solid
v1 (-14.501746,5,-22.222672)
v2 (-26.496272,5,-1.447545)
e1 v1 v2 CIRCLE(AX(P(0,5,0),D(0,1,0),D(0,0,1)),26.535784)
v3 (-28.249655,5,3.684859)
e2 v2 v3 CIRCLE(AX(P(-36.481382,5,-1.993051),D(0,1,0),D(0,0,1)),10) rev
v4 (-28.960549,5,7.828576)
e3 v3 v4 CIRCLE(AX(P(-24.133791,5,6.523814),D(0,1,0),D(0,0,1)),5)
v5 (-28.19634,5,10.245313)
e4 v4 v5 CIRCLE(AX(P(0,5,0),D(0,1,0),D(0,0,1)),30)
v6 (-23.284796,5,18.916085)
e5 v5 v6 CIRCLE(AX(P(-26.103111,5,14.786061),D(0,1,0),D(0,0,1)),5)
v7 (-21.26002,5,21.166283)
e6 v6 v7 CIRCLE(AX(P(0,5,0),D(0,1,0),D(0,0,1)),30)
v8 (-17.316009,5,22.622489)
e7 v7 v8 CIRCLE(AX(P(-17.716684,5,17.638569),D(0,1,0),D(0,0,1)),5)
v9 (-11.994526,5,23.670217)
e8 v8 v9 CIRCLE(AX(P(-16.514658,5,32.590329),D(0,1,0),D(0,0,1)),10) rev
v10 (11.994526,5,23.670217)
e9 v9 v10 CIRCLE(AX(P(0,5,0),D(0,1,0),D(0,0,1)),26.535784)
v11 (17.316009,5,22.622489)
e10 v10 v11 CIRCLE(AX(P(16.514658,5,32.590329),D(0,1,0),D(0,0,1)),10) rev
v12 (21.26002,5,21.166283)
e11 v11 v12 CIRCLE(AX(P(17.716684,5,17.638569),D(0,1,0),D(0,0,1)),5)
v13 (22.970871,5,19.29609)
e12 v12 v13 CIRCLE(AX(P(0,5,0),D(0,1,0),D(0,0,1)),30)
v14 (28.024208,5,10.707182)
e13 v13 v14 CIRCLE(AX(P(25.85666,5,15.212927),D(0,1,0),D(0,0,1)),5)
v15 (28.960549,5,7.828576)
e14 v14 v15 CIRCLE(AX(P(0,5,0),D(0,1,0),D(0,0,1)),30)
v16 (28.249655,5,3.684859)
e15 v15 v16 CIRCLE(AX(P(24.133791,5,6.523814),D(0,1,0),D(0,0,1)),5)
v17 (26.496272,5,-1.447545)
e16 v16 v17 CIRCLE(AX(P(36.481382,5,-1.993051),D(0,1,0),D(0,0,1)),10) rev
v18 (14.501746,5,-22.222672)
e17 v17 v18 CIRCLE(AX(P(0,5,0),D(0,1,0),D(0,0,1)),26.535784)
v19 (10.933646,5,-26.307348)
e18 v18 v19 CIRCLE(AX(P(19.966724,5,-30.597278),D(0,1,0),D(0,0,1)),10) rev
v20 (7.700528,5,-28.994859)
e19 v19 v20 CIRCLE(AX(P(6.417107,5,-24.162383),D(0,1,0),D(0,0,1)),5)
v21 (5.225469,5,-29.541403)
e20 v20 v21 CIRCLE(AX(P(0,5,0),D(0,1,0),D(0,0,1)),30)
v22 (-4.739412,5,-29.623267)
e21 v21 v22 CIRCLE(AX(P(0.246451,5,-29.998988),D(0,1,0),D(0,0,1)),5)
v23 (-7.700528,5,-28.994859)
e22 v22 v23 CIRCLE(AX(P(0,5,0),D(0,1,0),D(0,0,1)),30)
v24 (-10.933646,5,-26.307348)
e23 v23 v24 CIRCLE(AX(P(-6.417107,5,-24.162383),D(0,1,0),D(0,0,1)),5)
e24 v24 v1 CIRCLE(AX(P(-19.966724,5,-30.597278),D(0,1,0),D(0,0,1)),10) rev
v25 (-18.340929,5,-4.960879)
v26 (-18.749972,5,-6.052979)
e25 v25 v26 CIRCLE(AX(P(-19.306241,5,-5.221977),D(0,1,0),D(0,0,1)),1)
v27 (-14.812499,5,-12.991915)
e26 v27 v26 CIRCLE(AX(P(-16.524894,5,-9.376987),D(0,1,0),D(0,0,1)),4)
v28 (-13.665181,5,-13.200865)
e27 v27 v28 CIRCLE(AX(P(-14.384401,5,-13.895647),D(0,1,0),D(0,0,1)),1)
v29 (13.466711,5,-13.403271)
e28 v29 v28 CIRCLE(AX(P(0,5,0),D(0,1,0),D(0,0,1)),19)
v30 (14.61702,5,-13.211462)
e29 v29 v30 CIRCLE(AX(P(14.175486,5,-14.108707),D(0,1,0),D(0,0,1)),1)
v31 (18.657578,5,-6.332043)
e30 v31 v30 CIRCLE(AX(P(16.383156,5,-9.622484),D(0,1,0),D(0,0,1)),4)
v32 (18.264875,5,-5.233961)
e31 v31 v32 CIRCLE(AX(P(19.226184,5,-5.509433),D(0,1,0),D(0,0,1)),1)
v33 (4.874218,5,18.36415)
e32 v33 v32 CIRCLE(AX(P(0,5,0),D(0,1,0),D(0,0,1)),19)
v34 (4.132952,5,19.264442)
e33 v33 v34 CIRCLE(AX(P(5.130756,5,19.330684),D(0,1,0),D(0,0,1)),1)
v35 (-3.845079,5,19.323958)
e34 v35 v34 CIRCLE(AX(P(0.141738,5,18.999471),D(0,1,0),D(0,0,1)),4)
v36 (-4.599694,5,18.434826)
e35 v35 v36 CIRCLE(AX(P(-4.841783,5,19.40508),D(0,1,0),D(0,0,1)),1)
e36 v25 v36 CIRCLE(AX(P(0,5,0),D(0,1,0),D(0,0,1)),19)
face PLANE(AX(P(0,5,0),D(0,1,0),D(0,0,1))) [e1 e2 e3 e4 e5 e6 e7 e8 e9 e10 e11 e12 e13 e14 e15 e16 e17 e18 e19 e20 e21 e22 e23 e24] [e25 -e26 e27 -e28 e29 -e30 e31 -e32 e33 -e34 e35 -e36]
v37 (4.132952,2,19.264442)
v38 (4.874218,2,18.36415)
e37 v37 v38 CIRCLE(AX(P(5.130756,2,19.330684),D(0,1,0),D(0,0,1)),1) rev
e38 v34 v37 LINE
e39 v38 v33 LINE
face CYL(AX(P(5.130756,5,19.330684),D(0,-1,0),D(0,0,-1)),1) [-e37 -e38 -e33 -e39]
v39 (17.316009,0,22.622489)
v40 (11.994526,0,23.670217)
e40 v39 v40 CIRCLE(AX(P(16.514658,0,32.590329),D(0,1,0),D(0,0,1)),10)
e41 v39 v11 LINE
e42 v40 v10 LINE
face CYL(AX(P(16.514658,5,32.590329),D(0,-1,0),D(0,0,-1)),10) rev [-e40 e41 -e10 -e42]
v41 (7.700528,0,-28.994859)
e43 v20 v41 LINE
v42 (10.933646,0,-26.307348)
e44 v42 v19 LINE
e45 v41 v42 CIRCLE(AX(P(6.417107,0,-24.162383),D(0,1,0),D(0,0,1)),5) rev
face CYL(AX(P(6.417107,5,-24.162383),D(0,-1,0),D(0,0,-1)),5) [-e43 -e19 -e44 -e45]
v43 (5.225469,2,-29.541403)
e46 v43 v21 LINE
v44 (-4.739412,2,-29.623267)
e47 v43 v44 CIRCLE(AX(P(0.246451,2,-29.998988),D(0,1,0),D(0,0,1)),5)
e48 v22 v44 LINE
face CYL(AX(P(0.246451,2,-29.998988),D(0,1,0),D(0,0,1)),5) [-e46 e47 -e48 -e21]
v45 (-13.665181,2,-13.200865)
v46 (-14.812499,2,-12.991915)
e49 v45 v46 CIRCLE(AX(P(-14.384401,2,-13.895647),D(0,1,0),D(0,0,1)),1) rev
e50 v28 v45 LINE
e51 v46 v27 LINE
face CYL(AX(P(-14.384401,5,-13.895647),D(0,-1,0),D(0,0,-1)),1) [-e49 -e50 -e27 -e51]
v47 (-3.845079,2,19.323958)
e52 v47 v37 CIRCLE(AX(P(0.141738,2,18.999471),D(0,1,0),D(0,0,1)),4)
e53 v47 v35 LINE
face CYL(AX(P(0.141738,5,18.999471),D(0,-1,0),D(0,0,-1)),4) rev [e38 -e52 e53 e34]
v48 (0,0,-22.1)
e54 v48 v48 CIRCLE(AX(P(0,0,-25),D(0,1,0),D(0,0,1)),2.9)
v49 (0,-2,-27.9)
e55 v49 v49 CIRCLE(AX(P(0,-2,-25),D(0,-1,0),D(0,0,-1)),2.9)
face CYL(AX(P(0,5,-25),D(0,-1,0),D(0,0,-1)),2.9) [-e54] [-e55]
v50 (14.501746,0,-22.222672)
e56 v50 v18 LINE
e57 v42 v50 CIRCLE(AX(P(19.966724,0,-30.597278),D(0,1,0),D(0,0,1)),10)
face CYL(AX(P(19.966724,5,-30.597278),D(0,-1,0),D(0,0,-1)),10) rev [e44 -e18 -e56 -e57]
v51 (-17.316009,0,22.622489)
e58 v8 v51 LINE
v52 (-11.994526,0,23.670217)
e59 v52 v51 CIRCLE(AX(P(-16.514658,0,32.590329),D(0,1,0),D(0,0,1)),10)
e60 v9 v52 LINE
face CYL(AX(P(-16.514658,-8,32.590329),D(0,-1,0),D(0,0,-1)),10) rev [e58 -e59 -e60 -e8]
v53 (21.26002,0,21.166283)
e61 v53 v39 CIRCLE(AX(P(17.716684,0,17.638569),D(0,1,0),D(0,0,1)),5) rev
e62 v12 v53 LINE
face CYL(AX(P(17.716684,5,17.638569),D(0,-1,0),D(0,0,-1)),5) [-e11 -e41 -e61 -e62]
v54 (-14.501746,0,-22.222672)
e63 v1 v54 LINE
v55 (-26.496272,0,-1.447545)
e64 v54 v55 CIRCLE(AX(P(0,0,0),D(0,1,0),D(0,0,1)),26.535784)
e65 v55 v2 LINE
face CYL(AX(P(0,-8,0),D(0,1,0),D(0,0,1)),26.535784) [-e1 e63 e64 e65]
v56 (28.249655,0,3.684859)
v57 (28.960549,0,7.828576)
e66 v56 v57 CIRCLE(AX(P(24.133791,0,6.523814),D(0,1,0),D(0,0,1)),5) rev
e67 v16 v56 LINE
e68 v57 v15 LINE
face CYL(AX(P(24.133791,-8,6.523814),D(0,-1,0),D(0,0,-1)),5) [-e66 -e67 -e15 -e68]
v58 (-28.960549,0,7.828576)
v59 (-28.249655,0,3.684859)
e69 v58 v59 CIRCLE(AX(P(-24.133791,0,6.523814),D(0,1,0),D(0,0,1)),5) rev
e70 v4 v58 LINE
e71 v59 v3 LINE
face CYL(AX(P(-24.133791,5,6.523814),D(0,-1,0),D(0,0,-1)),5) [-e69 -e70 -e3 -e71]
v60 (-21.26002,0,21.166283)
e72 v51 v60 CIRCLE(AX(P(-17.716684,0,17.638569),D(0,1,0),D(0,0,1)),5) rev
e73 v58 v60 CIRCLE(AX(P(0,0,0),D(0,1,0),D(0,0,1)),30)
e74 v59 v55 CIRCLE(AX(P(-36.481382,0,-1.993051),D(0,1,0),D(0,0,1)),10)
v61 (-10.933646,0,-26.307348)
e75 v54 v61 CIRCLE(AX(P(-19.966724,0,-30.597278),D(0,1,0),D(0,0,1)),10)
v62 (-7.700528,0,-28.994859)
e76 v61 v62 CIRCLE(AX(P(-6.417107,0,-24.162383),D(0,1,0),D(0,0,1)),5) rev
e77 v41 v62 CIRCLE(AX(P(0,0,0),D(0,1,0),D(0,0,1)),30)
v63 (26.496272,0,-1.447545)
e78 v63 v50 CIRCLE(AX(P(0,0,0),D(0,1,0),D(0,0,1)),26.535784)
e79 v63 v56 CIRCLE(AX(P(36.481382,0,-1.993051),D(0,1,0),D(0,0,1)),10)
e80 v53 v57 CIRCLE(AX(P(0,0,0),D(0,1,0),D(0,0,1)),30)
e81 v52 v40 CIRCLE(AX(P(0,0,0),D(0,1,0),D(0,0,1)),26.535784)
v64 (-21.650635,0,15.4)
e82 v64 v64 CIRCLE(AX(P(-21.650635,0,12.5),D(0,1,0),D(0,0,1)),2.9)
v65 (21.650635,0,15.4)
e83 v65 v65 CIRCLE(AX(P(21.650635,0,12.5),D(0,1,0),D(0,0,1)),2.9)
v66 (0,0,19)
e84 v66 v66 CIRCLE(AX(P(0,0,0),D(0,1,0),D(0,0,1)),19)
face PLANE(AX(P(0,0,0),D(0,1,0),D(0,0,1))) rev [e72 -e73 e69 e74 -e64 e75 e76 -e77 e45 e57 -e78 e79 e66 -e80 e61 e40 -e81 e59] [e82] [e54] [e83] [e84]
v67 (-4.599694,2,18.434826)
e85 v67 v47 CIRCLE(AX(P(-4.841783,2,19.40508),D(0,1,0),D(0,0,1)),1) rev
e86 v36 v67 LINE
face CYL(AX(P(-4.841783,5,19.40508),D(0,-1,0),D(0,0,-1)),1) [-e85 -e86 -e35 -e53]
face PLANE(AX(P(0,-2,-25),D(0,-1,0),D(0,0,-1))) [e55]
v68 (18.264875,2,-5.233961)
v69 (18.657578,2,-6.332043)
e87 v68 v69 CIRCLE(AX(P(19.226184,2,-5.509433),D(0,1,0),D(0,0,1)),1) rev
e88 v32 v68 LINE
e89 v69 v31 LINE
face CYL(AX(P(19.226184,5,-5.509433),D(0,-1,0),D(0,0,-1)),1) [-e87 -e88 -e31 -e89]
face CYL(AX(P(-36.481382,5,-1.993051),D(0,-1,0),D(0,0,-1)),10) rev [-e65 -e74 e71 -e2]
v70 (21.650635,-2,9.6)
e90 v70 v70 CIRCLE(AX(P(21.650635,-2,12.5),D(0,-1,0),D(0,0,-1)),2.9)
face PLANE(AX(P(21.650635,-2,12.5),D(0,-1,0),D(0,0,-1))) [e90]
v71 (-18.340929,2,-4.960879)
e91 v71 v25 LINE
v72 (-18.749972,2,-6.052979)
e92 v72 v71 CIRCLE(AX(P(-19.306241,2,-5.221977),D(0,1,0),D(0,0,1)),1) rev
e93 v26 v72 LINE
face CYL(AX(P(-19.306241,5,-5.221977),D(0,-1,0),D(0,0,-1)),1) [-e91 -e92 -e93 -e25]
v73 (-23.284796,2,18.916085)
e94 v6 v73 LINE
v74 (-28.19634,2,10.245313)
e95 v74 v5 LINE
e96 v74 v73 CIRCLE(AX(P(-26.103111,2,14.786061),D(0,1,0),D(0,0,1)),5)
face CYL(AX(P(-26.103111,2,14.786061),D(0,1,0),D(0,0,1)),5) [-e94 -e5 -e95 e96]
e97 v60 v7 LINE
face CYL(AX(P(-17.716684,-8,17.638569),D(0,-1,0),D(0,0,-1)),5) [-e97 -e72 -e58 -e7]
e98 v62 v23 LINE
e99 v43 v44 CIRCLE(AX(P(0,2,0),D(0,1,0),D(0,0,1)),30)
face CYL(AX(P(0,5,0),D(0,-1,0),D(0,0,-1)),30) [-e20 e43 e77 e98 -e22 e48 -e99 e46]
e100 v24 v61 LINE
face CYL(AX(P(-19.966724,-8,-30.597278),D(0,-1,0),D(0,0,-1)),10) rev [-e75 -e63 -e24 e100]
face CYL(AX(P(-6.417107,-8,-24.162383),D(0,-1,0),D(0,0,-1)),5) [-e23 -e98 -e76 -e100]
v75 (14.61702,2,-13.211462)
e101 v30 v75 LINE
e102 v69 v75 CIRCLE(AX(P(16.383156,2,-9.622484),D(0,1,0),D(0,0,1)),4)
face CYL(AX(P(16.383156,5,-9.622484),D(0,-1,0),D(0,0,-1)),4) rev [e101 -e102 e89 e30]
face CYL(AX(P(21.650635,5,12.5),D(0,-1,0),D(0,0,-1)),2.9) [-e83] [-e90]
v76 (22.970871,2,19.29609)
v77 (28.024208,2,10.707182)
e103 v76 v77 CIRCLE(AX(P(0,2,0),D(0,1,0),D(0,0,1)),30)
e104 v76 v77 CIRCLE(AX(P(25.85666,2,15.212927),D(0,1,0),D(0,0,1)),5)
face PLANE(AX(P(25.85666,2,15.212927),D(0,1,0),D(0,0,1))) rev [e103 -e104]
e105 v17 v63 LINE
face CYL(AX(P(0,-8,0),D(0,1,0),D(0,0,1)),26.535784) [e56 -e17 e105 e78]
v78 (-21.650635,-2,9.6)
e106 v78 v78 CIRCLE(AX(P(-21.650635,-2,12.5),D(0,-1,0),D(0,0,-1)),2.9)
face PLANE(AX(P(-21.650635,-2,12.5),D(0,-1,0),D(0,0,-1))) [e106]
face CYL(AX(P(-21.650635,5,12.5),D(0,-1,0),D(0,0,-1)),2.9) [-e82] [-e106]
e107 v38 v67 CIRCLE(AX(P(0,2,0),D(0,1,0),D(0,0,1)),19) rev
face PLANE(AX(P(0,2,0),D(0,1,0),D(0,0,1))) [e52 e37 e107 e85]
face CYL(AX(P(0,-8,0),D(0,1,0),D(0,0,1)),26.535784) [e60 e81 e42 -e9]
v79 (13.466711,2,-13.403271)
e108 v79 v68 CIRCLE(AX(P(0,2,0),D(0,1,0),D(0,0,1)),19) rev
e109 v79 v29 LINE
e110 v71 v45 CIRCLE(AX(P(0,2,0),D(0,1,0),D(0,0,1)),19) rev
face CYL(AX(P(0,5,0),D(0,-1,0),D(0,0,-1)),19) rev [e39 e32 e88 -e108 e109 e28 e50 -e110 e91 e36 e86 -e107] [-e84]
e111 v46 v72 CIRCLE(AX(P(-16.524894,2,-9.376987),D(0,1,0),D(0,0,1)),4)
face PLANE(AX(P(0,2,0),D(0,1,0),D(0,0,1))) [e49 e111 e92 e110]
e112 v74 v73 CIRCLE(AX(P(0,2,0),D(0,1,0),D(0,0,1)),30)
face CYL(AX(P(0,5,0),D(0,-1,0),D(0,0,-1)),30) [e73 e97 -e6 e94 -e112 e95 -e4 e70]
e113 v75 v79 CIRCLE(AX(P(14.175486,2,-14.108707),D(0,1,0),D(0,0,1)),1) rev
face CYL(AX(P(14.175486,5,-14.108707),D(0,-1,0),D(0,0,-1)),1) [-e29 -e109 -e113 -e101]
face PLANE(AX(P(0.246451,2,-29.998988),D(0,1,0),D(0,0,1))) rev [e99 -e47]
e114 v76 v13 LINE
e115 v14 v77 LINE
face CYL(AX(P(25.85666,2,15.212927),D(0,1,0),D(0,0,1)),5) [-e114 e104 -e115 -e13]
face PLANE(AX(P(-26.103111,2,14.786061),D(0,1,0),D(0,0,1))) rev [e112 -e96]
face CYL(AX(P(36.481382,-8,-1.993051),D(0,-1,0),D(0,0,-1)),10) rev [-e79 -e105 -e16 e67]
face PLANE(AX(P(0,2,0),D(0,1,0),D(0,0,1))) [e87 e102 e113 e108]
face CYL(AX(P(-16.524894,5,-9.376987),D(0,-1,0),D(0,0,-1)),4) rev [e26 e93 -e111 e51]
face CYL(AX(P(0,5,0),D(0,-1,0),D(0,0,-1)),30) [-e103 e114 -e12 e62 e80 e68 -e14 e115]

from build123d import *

# Parameters (mm, degrees)
SKETCH1_R                = 19
BOSS_EXTRUDE1_DEPTH      = 3.5
SKETCH2_R                = 30
SKETCH2_R_2              = 19
SKETCH2_R_3              = 2.8
BOSS_EXTRUDE2_DEPTH      = 5
BOSS_EXTRUDE3_DEPTH      = 2
BOSS_EXTRUDE3_DEPTH_BACK = 5
SKETCH4_R                = 2.9
SKETCH5_R                = 5
BOSS_EXTRUDE4_DEPTH      = 3
CUT_EXTRUDE1_START       = -10
SKETCH3_R                = 19
CUT_EXTRUDE1_DEPTH       = 10
CUT_EXTRUDE3_START       = -13
CUT_EXTRUDE3_DEPTH       = 13
FILLET1_R                = 10
FILLET2_R                = 5
CUT_EXTRUDE4_START       = -3
SKETCH8_R                = 4
SKETCH8_R_2              = 19
CUT_EXTRUDE4_DEPTH       = 3
FILLET3_R                = 1


with BuildPart() as part:
    # Sketch1 → Boss-Extrude1 (new body)
    with BuildSketch(Plane(origin=(0, 0, 0), x_dir=(1, 0, 0), z_dir=(0, 1, 0))):
        with Locations(Location((0, 0, 0), (0, 0, 270))):
            Circle(SKETCH1_R)
    extrude(amount=BOSS_EXTRUDE1_DEPTH)

    # Sketch2 → Boss-Extrude2 (add)
    with BuildSketch(Plane(origin=(0, 0, 0), x_dir=(1, 0, 0), z_dir=(0, 1, 0))):
        with Locations(Location((0, 0, 0), (0, 0, 270))):
            Circle(SKETCH2_R)
        with Locations(Location((0, 0, 0), (0, 0, 270))):
            Circle(SKETCH2_R_2, mode=Mode.SUBTRACT)
        with Locations(Location((0, 25, 0), (0, 0, 270))):
            Circle(SKETCH2_R_3, mode=Mode.SUBTRACT)
        with Locations(Location((21.650635095, -12.5, 0), (0, 0, 270))):
            Circle(SKETCH2_R_3, mode=Mode.SUBTRACT)
        with Locations(Location((-21.650635095, -12.5, 0), (0, 0, 270))):
            Circle(SKETCH2_R_3, mode=Mode.SUBTRACT)
    extrude(amount=BOSS_EXTRUDE2_DEPTH)

    # Sketch4 → Boss-Extrude3 (add, two sides: drawn at the far end of the back side and taken through both)
    with BuildSketch(Plane.XZ.offset(-BOSS_EXTRUDE3_DEPTH_BACK)):
        with Locations(Location((-21.650635095, 12.5, 0), (0, 0, 270))):
            Circle(SKETCH4_R)
        with Locations(Location((21.650635095, 12.5, 0), (0, 0, 270))):
            Circle(SKETCH4_R)
        with Locations(Location((0, -25, 0), (0, 0, 270))):
            Circle(SKETCH4_R)
    extrude(amount=BOSS_EXTRUDE3_DEPTH + BOSS_EXTRUDE3_DEPTH_BACK)

    # Sketch5 → Boss-Extrude4 (add)
    with BuildSketch(Plane(origin=(0, 5, 0), x_dir=(1, 0, 0), z_dir=(0, 1, 0))):
        with Locations((-26.103110985, -14.7860609)):
            Circle(SKETCH5_R)
        with Locations((0.246451131, 29.99898768)):
            Circle(SKETCH5_R)
        with Locations((25.856659853, -15.212926781)):
            Circle(SKETCH5_R)
    extrude(amount=-BOSS_EXTRUDE4_DEPTH)

    # Sketch3 → Cut-Extrude1 (cut)
    with BuildSketch(Plane(origin=(0, 3.5, 0), x_dir=(1, 0, 0), z_dir=(0, 1, 0)).offset(CUT_EXTRUDE1_START)):
        with Locations(Location((0, 0, 0), (0, 0, 270))):
            Circle(SKETCH3_R)
    extrude(amount=CUT_EXTRUDE1_DEPTH, mode=Mode.SUBTRACT)

    # Sketch7 → Cut-Extrude3 (cut)
    with BuildSketch(Plane(origin=(0, 5, 0), x_dir=(1, 0, 0), z_dir=(0, 1, 0)).offset(CUT_EXTRUDE3_START)):
        with BuildLine():
            ThreePointArc((-29.54423259, -5.20944533), (-25.980762114, 15), (-10.2606043, 28.190778624))
            Line((-10.2606043, 28.190778624), (-13.773984089, 37.84371026))
            Line((-13.773984089, 37.84371026), (-43.939319858, -7.747687605))
            Line((-43.939319858, -7.747687605), (-29.54423259, -5.20944533))
        make_face()
        with BuildLine():
            ThreePointArc((-26.13264562, -4.6078905), (-22.980662881, 13.267891901), (-9.075772579, 24.935480225))
            Line((-9.075772579, 24.935480225), (-10.2606043, 28.190778624))
            ThreePointArc((-10.2606043, 28.190778624), (-25.980762114, 15), (-29.54423259, -5.20944533))
            Line((-29.54423259, -5.20944533), (-26.13264562, -4.6078905))
        make_face()
        with BuildLine():
            Line((15.259965643, 41.926411025), (10.2606043, 28.190778624))
            ThreePointArc((10.2606043, 28.190778624), (25.980762114, 15), (29.54423259, -5.20944533))
            Line((29.54423259, -5.20944533), (39.660606503, -6.993234998))
            Line((39.660606503, -6.993234998), (15.259965643, 41.926411025))
        make_face()
        with BuildLine():
            Line((10.2606043, 28.190778624), (9.075772579, 24.935480225))
            ThreePointArc((9.075772579, 24.935480225), (21.736841548, 15.220300308), (26.535783801, 0))
            ThreePointArc((26.535783801, 0), (26.434807132, -2.312745947), (26.13264562, -4.6078905))
            Line((26.13264562, -4.6078905), (29.54423259, -5.20944533))
            ThreePointArc((29.54423259, -5.20944533), (25.980762114, 15), (10.2606043, 28.190778624))
        make_face()
        with BuildLine():
            Line((28.679354216, -34.17872342), (19.283628291, -22.981333294))
            ThreePointArc((19.283628291, -22.981333294), (0, -30), (-19.283628291, -22.981333294))
            Line((-19.283628291, -22.981333294), (-25.886622414, -30.850475262))
            Line((-25.886622414, -30.850475262), (28.679354216, -34.17872342))
        make_face()
        with BuildLine():
            Line((19.283628291, -22.981333294), (17.056873041, -20.327589725))
            ThreePointArc((17.056873041, -20.327589725), (0, -26.535783801), (-17.056873041, -20.327589725))
            Line((-17.056873041, -20.327589725), (-19.283628291, -22.981333294))
            ThreePointArc((-19.283628291, -22.981333294), (0, -30), (19.283628291, -22.981333294))
        make_face()
    extrude(amount=CUT_EXTRUDE3_DEPTH, mode=Mode.SUBTRACT)

    # Fillet1
    # the kernel refuses this fillet: 10 mm, written as the material it adds along each edge
    with BuildSketch(Plane(origin=(-26.13264562, 0, 4.6078905), x_dir=(-0.9848077530122318, 0, 0.17364817766679624), z_dir=(0, 1, 0)), Plane(origin=(17.056873041, 0, 20.327589725), x_dir=(0.6427876096865569, 0, 0.7660444431189634), z_dir=(0, 1, 0)), Plane(origin=(9.075772579, 0, -24.935480225), x_dir=(0.34202014332561265, 0, -0.9396926207859289), z_dir=(0, 1, 0))) as fillet1_piece_1:
        with BuildLine():
            CenterArc((9.045274498, -8.297697769), FILLET1_R, 123.92490422, 42.948020906)
            Line((-0.693413056, -6.026582466), (-0.888186807, -5.98116016))
            ThreePointArc((-0.888186807, -5.98116016), (-0.372612378, -3.01031053), (-0.2, 0))
            Line((-0.2, 0), (0, 0.2))
            ThreePointArc((0, 0.2), (1.732108099, 0.2), (3.352595033, 0.165953955))
            Line((3.352595033, 0.165953955), (3.464216199, 0))
        make_face()
    extrude(amount=5)
    with BuildSketch(Plane(origin=(-17.056873041, 0, 20.327589725), x_dir=(0.8344973728156843, 0, 0.551011918894429), z_dir=(0, 1, 0)), Plane(origin=(26.13264562, 0, 4.6078905), x_dir=(0.059941633142754296, 0, -0.99820188369697), z_dir=(0, 1, 0)), Plane(origin=(-9.075772579, 0, -24.935480225), x_dir=(-0.8944390059584274, 0, 0.44718996480254386), z_dir=(0, 1, 0))) as fillet1_piece_2:
        with BuildLine():
            CenterArc((7.20939257, -9.934457095), FILLET1_R, 96.563537437, 42.948020906)
            Line((-0.39597707, -3.441510719), (-0.548084463, -3.311651792))
            ThreePointArc((-0.548084463, -3.311651792), (-0.396677677, -1.697894369), (-0.198689142, 0.022860991))
            Line((-0.198689142, 0.022860991), (0.022860991, 0.198689142))
            ThreePointArc((0.022860991, 0.198689142), (3.03317152, 0.026076764), (6.04348205, 0.198689142))
            Line((6.04348205, 0.198689142), (6.06634304, 0))
        make_face()
    extrude(amount=5)

    # Fillet2
    fillet2_edges = [part.edges().sort_by_distance(p)[0] for p in [
        (-10.2606043, 2.5, -28.190778624),
        (-29.54423259, 2.5, 5.20944533),
        (-19.283628291, 2.5, 22.981333294),
        (19.283628291, 2.5, 22.981333294),
        (29.54423259, 2.5, 5.20944533),
        (10.2606043, 2.5, -28.190778624),
    ]]
    fillet(fillet2_edges, radius=FILLET2_R)

    # Sketch8 → Cut-Extrude4 (cut)
    with BuildSketch(Plane(origin=(0, 5, 0), x_dir=(1, 0, 0), z_dir=(0, 1, 0)).offset(CUT_EXTRUDE4_START)):
        with Locations((-16.524893724, 9.376987118)):
            Circle(SKETCH8_R)
        with Locations(Location((0, 0, 0), (0, 0, 42.512080704))):
            Circle(SKETCH8_R_2)
        with Locations((16.383155917, 9.622484201)):
            Circle(SKETCH8_R)
        with Locations((0.141737807, -18.999471319)):
            Circle(SKETCH8_R)
    extrude(amount=CUT_EXTRUDE4_DEPTH, mode=Mode.SUBTRACT)

    # Fillet3
    # the kernel refuses this fillet: 1 mm, written as the material it takes off along each edge
    with BuildSketch(Plane(origin=(-18.121826323, 6.950278825, -5.709589366), x_dir=(-0.28086097725665193, 0, 0.9597484625955065), z_dir=(0, -1, 0)), Plane(origin=(14.005562597, 6.950278825, -12.839167276), x_dir=(-0.6907360612225409, 0, -0.7231069725336425), z_dir=(0, -1, 0))) as fillet3_piece_1:
        with BuildLine():
            CenterArc((0.800640781, 0.999789253), FILLET3_R, 197.486602821, 71.337075115)
            ThreePointArc((-0.153146456, 0.699306464), (-0.060897436, 0.353086193), (0, 0))
            ThreePointArc((0, 0), (0.390055765, 0.004004198), (0.78011153, 0))
        make_face()
    extrude(amount=4.950278825, mode=Mode.SUBTRACT)
    with BuildSketch(Plane(origin=(-14.195555863, 6.950278825, -12.628784333), x_dir=(-0.8617980531882996, 0, -0.5072515308216002), z_dir=(0, -1, 0)), Plane(origin=(18.034625983, 6.950278825, -5.979319831), x_dir=(0.8701917383942803, 0, -0.49271324158209956), z_dir=(0, -1, 0))) as fillet3_piece_2:
        with BuildLine():
            CenterArc((0.805364366, 0.995988176), FILLET3_R, 193.528948716, 71.337075115)
            ThreePointArc((-0.166887482, 0.762051552), (-0.079532242, 0.381882385), (0, 0))
            ThreePointArc((0, 0), (0.357939718, 0.016047295), (0.715879437, 0))
        make_face()
    extrude(amount=4.950278825, mode=Mode.SUBTRACT)
    with BuildSketch(Plane(origin=(4.116263726, 6.950278825, 18.548756641), x_dir=(0.023311579398747933, 0, 0.9997282482084497), z_dir=(0, -1, 0))) as fillet3_piece_3:
        with BuildLine():
            CenterArc((0.805364366, -0.995988176), FILLET3_R, 95.133976169, 71.337075115)
            ThreePointArc((-0.166887482, -0.762051552), (-0.079532242, -0.381882385), (0, 0))
            ThreePointArc((0, 0), (0.357939718, -0.016047295), (0.715879437, 0))
        make_face()
    extrude(amount=4.950278825, mode=Mode.SUBTRACT)
    with BuildSketch(Plane(origin=(-3.83907012, 6.950278825, 18.608104165), x_dir=(-0.9750194381231715, 0, -0.22211955177780904), z_dir=(0, -1, 0))) as fillet3_piece_4:
        with BuildLine():
            CenterArc((0.800640781, -0.999789253), FILLET3_R, 91.176322064, 71.337075115)
            ThreePointArc((-0.153146456, -0.699306464), (-0.060897436, -0.353086193), (0, 0))
            ThreePointArc((0, 0), (0.390055765, -0.004004198), (0.78011153, 0))
        make_face()
    extrude(amount=4.950278825, mode=Mode.SUBTRACT)


solid = part.part
